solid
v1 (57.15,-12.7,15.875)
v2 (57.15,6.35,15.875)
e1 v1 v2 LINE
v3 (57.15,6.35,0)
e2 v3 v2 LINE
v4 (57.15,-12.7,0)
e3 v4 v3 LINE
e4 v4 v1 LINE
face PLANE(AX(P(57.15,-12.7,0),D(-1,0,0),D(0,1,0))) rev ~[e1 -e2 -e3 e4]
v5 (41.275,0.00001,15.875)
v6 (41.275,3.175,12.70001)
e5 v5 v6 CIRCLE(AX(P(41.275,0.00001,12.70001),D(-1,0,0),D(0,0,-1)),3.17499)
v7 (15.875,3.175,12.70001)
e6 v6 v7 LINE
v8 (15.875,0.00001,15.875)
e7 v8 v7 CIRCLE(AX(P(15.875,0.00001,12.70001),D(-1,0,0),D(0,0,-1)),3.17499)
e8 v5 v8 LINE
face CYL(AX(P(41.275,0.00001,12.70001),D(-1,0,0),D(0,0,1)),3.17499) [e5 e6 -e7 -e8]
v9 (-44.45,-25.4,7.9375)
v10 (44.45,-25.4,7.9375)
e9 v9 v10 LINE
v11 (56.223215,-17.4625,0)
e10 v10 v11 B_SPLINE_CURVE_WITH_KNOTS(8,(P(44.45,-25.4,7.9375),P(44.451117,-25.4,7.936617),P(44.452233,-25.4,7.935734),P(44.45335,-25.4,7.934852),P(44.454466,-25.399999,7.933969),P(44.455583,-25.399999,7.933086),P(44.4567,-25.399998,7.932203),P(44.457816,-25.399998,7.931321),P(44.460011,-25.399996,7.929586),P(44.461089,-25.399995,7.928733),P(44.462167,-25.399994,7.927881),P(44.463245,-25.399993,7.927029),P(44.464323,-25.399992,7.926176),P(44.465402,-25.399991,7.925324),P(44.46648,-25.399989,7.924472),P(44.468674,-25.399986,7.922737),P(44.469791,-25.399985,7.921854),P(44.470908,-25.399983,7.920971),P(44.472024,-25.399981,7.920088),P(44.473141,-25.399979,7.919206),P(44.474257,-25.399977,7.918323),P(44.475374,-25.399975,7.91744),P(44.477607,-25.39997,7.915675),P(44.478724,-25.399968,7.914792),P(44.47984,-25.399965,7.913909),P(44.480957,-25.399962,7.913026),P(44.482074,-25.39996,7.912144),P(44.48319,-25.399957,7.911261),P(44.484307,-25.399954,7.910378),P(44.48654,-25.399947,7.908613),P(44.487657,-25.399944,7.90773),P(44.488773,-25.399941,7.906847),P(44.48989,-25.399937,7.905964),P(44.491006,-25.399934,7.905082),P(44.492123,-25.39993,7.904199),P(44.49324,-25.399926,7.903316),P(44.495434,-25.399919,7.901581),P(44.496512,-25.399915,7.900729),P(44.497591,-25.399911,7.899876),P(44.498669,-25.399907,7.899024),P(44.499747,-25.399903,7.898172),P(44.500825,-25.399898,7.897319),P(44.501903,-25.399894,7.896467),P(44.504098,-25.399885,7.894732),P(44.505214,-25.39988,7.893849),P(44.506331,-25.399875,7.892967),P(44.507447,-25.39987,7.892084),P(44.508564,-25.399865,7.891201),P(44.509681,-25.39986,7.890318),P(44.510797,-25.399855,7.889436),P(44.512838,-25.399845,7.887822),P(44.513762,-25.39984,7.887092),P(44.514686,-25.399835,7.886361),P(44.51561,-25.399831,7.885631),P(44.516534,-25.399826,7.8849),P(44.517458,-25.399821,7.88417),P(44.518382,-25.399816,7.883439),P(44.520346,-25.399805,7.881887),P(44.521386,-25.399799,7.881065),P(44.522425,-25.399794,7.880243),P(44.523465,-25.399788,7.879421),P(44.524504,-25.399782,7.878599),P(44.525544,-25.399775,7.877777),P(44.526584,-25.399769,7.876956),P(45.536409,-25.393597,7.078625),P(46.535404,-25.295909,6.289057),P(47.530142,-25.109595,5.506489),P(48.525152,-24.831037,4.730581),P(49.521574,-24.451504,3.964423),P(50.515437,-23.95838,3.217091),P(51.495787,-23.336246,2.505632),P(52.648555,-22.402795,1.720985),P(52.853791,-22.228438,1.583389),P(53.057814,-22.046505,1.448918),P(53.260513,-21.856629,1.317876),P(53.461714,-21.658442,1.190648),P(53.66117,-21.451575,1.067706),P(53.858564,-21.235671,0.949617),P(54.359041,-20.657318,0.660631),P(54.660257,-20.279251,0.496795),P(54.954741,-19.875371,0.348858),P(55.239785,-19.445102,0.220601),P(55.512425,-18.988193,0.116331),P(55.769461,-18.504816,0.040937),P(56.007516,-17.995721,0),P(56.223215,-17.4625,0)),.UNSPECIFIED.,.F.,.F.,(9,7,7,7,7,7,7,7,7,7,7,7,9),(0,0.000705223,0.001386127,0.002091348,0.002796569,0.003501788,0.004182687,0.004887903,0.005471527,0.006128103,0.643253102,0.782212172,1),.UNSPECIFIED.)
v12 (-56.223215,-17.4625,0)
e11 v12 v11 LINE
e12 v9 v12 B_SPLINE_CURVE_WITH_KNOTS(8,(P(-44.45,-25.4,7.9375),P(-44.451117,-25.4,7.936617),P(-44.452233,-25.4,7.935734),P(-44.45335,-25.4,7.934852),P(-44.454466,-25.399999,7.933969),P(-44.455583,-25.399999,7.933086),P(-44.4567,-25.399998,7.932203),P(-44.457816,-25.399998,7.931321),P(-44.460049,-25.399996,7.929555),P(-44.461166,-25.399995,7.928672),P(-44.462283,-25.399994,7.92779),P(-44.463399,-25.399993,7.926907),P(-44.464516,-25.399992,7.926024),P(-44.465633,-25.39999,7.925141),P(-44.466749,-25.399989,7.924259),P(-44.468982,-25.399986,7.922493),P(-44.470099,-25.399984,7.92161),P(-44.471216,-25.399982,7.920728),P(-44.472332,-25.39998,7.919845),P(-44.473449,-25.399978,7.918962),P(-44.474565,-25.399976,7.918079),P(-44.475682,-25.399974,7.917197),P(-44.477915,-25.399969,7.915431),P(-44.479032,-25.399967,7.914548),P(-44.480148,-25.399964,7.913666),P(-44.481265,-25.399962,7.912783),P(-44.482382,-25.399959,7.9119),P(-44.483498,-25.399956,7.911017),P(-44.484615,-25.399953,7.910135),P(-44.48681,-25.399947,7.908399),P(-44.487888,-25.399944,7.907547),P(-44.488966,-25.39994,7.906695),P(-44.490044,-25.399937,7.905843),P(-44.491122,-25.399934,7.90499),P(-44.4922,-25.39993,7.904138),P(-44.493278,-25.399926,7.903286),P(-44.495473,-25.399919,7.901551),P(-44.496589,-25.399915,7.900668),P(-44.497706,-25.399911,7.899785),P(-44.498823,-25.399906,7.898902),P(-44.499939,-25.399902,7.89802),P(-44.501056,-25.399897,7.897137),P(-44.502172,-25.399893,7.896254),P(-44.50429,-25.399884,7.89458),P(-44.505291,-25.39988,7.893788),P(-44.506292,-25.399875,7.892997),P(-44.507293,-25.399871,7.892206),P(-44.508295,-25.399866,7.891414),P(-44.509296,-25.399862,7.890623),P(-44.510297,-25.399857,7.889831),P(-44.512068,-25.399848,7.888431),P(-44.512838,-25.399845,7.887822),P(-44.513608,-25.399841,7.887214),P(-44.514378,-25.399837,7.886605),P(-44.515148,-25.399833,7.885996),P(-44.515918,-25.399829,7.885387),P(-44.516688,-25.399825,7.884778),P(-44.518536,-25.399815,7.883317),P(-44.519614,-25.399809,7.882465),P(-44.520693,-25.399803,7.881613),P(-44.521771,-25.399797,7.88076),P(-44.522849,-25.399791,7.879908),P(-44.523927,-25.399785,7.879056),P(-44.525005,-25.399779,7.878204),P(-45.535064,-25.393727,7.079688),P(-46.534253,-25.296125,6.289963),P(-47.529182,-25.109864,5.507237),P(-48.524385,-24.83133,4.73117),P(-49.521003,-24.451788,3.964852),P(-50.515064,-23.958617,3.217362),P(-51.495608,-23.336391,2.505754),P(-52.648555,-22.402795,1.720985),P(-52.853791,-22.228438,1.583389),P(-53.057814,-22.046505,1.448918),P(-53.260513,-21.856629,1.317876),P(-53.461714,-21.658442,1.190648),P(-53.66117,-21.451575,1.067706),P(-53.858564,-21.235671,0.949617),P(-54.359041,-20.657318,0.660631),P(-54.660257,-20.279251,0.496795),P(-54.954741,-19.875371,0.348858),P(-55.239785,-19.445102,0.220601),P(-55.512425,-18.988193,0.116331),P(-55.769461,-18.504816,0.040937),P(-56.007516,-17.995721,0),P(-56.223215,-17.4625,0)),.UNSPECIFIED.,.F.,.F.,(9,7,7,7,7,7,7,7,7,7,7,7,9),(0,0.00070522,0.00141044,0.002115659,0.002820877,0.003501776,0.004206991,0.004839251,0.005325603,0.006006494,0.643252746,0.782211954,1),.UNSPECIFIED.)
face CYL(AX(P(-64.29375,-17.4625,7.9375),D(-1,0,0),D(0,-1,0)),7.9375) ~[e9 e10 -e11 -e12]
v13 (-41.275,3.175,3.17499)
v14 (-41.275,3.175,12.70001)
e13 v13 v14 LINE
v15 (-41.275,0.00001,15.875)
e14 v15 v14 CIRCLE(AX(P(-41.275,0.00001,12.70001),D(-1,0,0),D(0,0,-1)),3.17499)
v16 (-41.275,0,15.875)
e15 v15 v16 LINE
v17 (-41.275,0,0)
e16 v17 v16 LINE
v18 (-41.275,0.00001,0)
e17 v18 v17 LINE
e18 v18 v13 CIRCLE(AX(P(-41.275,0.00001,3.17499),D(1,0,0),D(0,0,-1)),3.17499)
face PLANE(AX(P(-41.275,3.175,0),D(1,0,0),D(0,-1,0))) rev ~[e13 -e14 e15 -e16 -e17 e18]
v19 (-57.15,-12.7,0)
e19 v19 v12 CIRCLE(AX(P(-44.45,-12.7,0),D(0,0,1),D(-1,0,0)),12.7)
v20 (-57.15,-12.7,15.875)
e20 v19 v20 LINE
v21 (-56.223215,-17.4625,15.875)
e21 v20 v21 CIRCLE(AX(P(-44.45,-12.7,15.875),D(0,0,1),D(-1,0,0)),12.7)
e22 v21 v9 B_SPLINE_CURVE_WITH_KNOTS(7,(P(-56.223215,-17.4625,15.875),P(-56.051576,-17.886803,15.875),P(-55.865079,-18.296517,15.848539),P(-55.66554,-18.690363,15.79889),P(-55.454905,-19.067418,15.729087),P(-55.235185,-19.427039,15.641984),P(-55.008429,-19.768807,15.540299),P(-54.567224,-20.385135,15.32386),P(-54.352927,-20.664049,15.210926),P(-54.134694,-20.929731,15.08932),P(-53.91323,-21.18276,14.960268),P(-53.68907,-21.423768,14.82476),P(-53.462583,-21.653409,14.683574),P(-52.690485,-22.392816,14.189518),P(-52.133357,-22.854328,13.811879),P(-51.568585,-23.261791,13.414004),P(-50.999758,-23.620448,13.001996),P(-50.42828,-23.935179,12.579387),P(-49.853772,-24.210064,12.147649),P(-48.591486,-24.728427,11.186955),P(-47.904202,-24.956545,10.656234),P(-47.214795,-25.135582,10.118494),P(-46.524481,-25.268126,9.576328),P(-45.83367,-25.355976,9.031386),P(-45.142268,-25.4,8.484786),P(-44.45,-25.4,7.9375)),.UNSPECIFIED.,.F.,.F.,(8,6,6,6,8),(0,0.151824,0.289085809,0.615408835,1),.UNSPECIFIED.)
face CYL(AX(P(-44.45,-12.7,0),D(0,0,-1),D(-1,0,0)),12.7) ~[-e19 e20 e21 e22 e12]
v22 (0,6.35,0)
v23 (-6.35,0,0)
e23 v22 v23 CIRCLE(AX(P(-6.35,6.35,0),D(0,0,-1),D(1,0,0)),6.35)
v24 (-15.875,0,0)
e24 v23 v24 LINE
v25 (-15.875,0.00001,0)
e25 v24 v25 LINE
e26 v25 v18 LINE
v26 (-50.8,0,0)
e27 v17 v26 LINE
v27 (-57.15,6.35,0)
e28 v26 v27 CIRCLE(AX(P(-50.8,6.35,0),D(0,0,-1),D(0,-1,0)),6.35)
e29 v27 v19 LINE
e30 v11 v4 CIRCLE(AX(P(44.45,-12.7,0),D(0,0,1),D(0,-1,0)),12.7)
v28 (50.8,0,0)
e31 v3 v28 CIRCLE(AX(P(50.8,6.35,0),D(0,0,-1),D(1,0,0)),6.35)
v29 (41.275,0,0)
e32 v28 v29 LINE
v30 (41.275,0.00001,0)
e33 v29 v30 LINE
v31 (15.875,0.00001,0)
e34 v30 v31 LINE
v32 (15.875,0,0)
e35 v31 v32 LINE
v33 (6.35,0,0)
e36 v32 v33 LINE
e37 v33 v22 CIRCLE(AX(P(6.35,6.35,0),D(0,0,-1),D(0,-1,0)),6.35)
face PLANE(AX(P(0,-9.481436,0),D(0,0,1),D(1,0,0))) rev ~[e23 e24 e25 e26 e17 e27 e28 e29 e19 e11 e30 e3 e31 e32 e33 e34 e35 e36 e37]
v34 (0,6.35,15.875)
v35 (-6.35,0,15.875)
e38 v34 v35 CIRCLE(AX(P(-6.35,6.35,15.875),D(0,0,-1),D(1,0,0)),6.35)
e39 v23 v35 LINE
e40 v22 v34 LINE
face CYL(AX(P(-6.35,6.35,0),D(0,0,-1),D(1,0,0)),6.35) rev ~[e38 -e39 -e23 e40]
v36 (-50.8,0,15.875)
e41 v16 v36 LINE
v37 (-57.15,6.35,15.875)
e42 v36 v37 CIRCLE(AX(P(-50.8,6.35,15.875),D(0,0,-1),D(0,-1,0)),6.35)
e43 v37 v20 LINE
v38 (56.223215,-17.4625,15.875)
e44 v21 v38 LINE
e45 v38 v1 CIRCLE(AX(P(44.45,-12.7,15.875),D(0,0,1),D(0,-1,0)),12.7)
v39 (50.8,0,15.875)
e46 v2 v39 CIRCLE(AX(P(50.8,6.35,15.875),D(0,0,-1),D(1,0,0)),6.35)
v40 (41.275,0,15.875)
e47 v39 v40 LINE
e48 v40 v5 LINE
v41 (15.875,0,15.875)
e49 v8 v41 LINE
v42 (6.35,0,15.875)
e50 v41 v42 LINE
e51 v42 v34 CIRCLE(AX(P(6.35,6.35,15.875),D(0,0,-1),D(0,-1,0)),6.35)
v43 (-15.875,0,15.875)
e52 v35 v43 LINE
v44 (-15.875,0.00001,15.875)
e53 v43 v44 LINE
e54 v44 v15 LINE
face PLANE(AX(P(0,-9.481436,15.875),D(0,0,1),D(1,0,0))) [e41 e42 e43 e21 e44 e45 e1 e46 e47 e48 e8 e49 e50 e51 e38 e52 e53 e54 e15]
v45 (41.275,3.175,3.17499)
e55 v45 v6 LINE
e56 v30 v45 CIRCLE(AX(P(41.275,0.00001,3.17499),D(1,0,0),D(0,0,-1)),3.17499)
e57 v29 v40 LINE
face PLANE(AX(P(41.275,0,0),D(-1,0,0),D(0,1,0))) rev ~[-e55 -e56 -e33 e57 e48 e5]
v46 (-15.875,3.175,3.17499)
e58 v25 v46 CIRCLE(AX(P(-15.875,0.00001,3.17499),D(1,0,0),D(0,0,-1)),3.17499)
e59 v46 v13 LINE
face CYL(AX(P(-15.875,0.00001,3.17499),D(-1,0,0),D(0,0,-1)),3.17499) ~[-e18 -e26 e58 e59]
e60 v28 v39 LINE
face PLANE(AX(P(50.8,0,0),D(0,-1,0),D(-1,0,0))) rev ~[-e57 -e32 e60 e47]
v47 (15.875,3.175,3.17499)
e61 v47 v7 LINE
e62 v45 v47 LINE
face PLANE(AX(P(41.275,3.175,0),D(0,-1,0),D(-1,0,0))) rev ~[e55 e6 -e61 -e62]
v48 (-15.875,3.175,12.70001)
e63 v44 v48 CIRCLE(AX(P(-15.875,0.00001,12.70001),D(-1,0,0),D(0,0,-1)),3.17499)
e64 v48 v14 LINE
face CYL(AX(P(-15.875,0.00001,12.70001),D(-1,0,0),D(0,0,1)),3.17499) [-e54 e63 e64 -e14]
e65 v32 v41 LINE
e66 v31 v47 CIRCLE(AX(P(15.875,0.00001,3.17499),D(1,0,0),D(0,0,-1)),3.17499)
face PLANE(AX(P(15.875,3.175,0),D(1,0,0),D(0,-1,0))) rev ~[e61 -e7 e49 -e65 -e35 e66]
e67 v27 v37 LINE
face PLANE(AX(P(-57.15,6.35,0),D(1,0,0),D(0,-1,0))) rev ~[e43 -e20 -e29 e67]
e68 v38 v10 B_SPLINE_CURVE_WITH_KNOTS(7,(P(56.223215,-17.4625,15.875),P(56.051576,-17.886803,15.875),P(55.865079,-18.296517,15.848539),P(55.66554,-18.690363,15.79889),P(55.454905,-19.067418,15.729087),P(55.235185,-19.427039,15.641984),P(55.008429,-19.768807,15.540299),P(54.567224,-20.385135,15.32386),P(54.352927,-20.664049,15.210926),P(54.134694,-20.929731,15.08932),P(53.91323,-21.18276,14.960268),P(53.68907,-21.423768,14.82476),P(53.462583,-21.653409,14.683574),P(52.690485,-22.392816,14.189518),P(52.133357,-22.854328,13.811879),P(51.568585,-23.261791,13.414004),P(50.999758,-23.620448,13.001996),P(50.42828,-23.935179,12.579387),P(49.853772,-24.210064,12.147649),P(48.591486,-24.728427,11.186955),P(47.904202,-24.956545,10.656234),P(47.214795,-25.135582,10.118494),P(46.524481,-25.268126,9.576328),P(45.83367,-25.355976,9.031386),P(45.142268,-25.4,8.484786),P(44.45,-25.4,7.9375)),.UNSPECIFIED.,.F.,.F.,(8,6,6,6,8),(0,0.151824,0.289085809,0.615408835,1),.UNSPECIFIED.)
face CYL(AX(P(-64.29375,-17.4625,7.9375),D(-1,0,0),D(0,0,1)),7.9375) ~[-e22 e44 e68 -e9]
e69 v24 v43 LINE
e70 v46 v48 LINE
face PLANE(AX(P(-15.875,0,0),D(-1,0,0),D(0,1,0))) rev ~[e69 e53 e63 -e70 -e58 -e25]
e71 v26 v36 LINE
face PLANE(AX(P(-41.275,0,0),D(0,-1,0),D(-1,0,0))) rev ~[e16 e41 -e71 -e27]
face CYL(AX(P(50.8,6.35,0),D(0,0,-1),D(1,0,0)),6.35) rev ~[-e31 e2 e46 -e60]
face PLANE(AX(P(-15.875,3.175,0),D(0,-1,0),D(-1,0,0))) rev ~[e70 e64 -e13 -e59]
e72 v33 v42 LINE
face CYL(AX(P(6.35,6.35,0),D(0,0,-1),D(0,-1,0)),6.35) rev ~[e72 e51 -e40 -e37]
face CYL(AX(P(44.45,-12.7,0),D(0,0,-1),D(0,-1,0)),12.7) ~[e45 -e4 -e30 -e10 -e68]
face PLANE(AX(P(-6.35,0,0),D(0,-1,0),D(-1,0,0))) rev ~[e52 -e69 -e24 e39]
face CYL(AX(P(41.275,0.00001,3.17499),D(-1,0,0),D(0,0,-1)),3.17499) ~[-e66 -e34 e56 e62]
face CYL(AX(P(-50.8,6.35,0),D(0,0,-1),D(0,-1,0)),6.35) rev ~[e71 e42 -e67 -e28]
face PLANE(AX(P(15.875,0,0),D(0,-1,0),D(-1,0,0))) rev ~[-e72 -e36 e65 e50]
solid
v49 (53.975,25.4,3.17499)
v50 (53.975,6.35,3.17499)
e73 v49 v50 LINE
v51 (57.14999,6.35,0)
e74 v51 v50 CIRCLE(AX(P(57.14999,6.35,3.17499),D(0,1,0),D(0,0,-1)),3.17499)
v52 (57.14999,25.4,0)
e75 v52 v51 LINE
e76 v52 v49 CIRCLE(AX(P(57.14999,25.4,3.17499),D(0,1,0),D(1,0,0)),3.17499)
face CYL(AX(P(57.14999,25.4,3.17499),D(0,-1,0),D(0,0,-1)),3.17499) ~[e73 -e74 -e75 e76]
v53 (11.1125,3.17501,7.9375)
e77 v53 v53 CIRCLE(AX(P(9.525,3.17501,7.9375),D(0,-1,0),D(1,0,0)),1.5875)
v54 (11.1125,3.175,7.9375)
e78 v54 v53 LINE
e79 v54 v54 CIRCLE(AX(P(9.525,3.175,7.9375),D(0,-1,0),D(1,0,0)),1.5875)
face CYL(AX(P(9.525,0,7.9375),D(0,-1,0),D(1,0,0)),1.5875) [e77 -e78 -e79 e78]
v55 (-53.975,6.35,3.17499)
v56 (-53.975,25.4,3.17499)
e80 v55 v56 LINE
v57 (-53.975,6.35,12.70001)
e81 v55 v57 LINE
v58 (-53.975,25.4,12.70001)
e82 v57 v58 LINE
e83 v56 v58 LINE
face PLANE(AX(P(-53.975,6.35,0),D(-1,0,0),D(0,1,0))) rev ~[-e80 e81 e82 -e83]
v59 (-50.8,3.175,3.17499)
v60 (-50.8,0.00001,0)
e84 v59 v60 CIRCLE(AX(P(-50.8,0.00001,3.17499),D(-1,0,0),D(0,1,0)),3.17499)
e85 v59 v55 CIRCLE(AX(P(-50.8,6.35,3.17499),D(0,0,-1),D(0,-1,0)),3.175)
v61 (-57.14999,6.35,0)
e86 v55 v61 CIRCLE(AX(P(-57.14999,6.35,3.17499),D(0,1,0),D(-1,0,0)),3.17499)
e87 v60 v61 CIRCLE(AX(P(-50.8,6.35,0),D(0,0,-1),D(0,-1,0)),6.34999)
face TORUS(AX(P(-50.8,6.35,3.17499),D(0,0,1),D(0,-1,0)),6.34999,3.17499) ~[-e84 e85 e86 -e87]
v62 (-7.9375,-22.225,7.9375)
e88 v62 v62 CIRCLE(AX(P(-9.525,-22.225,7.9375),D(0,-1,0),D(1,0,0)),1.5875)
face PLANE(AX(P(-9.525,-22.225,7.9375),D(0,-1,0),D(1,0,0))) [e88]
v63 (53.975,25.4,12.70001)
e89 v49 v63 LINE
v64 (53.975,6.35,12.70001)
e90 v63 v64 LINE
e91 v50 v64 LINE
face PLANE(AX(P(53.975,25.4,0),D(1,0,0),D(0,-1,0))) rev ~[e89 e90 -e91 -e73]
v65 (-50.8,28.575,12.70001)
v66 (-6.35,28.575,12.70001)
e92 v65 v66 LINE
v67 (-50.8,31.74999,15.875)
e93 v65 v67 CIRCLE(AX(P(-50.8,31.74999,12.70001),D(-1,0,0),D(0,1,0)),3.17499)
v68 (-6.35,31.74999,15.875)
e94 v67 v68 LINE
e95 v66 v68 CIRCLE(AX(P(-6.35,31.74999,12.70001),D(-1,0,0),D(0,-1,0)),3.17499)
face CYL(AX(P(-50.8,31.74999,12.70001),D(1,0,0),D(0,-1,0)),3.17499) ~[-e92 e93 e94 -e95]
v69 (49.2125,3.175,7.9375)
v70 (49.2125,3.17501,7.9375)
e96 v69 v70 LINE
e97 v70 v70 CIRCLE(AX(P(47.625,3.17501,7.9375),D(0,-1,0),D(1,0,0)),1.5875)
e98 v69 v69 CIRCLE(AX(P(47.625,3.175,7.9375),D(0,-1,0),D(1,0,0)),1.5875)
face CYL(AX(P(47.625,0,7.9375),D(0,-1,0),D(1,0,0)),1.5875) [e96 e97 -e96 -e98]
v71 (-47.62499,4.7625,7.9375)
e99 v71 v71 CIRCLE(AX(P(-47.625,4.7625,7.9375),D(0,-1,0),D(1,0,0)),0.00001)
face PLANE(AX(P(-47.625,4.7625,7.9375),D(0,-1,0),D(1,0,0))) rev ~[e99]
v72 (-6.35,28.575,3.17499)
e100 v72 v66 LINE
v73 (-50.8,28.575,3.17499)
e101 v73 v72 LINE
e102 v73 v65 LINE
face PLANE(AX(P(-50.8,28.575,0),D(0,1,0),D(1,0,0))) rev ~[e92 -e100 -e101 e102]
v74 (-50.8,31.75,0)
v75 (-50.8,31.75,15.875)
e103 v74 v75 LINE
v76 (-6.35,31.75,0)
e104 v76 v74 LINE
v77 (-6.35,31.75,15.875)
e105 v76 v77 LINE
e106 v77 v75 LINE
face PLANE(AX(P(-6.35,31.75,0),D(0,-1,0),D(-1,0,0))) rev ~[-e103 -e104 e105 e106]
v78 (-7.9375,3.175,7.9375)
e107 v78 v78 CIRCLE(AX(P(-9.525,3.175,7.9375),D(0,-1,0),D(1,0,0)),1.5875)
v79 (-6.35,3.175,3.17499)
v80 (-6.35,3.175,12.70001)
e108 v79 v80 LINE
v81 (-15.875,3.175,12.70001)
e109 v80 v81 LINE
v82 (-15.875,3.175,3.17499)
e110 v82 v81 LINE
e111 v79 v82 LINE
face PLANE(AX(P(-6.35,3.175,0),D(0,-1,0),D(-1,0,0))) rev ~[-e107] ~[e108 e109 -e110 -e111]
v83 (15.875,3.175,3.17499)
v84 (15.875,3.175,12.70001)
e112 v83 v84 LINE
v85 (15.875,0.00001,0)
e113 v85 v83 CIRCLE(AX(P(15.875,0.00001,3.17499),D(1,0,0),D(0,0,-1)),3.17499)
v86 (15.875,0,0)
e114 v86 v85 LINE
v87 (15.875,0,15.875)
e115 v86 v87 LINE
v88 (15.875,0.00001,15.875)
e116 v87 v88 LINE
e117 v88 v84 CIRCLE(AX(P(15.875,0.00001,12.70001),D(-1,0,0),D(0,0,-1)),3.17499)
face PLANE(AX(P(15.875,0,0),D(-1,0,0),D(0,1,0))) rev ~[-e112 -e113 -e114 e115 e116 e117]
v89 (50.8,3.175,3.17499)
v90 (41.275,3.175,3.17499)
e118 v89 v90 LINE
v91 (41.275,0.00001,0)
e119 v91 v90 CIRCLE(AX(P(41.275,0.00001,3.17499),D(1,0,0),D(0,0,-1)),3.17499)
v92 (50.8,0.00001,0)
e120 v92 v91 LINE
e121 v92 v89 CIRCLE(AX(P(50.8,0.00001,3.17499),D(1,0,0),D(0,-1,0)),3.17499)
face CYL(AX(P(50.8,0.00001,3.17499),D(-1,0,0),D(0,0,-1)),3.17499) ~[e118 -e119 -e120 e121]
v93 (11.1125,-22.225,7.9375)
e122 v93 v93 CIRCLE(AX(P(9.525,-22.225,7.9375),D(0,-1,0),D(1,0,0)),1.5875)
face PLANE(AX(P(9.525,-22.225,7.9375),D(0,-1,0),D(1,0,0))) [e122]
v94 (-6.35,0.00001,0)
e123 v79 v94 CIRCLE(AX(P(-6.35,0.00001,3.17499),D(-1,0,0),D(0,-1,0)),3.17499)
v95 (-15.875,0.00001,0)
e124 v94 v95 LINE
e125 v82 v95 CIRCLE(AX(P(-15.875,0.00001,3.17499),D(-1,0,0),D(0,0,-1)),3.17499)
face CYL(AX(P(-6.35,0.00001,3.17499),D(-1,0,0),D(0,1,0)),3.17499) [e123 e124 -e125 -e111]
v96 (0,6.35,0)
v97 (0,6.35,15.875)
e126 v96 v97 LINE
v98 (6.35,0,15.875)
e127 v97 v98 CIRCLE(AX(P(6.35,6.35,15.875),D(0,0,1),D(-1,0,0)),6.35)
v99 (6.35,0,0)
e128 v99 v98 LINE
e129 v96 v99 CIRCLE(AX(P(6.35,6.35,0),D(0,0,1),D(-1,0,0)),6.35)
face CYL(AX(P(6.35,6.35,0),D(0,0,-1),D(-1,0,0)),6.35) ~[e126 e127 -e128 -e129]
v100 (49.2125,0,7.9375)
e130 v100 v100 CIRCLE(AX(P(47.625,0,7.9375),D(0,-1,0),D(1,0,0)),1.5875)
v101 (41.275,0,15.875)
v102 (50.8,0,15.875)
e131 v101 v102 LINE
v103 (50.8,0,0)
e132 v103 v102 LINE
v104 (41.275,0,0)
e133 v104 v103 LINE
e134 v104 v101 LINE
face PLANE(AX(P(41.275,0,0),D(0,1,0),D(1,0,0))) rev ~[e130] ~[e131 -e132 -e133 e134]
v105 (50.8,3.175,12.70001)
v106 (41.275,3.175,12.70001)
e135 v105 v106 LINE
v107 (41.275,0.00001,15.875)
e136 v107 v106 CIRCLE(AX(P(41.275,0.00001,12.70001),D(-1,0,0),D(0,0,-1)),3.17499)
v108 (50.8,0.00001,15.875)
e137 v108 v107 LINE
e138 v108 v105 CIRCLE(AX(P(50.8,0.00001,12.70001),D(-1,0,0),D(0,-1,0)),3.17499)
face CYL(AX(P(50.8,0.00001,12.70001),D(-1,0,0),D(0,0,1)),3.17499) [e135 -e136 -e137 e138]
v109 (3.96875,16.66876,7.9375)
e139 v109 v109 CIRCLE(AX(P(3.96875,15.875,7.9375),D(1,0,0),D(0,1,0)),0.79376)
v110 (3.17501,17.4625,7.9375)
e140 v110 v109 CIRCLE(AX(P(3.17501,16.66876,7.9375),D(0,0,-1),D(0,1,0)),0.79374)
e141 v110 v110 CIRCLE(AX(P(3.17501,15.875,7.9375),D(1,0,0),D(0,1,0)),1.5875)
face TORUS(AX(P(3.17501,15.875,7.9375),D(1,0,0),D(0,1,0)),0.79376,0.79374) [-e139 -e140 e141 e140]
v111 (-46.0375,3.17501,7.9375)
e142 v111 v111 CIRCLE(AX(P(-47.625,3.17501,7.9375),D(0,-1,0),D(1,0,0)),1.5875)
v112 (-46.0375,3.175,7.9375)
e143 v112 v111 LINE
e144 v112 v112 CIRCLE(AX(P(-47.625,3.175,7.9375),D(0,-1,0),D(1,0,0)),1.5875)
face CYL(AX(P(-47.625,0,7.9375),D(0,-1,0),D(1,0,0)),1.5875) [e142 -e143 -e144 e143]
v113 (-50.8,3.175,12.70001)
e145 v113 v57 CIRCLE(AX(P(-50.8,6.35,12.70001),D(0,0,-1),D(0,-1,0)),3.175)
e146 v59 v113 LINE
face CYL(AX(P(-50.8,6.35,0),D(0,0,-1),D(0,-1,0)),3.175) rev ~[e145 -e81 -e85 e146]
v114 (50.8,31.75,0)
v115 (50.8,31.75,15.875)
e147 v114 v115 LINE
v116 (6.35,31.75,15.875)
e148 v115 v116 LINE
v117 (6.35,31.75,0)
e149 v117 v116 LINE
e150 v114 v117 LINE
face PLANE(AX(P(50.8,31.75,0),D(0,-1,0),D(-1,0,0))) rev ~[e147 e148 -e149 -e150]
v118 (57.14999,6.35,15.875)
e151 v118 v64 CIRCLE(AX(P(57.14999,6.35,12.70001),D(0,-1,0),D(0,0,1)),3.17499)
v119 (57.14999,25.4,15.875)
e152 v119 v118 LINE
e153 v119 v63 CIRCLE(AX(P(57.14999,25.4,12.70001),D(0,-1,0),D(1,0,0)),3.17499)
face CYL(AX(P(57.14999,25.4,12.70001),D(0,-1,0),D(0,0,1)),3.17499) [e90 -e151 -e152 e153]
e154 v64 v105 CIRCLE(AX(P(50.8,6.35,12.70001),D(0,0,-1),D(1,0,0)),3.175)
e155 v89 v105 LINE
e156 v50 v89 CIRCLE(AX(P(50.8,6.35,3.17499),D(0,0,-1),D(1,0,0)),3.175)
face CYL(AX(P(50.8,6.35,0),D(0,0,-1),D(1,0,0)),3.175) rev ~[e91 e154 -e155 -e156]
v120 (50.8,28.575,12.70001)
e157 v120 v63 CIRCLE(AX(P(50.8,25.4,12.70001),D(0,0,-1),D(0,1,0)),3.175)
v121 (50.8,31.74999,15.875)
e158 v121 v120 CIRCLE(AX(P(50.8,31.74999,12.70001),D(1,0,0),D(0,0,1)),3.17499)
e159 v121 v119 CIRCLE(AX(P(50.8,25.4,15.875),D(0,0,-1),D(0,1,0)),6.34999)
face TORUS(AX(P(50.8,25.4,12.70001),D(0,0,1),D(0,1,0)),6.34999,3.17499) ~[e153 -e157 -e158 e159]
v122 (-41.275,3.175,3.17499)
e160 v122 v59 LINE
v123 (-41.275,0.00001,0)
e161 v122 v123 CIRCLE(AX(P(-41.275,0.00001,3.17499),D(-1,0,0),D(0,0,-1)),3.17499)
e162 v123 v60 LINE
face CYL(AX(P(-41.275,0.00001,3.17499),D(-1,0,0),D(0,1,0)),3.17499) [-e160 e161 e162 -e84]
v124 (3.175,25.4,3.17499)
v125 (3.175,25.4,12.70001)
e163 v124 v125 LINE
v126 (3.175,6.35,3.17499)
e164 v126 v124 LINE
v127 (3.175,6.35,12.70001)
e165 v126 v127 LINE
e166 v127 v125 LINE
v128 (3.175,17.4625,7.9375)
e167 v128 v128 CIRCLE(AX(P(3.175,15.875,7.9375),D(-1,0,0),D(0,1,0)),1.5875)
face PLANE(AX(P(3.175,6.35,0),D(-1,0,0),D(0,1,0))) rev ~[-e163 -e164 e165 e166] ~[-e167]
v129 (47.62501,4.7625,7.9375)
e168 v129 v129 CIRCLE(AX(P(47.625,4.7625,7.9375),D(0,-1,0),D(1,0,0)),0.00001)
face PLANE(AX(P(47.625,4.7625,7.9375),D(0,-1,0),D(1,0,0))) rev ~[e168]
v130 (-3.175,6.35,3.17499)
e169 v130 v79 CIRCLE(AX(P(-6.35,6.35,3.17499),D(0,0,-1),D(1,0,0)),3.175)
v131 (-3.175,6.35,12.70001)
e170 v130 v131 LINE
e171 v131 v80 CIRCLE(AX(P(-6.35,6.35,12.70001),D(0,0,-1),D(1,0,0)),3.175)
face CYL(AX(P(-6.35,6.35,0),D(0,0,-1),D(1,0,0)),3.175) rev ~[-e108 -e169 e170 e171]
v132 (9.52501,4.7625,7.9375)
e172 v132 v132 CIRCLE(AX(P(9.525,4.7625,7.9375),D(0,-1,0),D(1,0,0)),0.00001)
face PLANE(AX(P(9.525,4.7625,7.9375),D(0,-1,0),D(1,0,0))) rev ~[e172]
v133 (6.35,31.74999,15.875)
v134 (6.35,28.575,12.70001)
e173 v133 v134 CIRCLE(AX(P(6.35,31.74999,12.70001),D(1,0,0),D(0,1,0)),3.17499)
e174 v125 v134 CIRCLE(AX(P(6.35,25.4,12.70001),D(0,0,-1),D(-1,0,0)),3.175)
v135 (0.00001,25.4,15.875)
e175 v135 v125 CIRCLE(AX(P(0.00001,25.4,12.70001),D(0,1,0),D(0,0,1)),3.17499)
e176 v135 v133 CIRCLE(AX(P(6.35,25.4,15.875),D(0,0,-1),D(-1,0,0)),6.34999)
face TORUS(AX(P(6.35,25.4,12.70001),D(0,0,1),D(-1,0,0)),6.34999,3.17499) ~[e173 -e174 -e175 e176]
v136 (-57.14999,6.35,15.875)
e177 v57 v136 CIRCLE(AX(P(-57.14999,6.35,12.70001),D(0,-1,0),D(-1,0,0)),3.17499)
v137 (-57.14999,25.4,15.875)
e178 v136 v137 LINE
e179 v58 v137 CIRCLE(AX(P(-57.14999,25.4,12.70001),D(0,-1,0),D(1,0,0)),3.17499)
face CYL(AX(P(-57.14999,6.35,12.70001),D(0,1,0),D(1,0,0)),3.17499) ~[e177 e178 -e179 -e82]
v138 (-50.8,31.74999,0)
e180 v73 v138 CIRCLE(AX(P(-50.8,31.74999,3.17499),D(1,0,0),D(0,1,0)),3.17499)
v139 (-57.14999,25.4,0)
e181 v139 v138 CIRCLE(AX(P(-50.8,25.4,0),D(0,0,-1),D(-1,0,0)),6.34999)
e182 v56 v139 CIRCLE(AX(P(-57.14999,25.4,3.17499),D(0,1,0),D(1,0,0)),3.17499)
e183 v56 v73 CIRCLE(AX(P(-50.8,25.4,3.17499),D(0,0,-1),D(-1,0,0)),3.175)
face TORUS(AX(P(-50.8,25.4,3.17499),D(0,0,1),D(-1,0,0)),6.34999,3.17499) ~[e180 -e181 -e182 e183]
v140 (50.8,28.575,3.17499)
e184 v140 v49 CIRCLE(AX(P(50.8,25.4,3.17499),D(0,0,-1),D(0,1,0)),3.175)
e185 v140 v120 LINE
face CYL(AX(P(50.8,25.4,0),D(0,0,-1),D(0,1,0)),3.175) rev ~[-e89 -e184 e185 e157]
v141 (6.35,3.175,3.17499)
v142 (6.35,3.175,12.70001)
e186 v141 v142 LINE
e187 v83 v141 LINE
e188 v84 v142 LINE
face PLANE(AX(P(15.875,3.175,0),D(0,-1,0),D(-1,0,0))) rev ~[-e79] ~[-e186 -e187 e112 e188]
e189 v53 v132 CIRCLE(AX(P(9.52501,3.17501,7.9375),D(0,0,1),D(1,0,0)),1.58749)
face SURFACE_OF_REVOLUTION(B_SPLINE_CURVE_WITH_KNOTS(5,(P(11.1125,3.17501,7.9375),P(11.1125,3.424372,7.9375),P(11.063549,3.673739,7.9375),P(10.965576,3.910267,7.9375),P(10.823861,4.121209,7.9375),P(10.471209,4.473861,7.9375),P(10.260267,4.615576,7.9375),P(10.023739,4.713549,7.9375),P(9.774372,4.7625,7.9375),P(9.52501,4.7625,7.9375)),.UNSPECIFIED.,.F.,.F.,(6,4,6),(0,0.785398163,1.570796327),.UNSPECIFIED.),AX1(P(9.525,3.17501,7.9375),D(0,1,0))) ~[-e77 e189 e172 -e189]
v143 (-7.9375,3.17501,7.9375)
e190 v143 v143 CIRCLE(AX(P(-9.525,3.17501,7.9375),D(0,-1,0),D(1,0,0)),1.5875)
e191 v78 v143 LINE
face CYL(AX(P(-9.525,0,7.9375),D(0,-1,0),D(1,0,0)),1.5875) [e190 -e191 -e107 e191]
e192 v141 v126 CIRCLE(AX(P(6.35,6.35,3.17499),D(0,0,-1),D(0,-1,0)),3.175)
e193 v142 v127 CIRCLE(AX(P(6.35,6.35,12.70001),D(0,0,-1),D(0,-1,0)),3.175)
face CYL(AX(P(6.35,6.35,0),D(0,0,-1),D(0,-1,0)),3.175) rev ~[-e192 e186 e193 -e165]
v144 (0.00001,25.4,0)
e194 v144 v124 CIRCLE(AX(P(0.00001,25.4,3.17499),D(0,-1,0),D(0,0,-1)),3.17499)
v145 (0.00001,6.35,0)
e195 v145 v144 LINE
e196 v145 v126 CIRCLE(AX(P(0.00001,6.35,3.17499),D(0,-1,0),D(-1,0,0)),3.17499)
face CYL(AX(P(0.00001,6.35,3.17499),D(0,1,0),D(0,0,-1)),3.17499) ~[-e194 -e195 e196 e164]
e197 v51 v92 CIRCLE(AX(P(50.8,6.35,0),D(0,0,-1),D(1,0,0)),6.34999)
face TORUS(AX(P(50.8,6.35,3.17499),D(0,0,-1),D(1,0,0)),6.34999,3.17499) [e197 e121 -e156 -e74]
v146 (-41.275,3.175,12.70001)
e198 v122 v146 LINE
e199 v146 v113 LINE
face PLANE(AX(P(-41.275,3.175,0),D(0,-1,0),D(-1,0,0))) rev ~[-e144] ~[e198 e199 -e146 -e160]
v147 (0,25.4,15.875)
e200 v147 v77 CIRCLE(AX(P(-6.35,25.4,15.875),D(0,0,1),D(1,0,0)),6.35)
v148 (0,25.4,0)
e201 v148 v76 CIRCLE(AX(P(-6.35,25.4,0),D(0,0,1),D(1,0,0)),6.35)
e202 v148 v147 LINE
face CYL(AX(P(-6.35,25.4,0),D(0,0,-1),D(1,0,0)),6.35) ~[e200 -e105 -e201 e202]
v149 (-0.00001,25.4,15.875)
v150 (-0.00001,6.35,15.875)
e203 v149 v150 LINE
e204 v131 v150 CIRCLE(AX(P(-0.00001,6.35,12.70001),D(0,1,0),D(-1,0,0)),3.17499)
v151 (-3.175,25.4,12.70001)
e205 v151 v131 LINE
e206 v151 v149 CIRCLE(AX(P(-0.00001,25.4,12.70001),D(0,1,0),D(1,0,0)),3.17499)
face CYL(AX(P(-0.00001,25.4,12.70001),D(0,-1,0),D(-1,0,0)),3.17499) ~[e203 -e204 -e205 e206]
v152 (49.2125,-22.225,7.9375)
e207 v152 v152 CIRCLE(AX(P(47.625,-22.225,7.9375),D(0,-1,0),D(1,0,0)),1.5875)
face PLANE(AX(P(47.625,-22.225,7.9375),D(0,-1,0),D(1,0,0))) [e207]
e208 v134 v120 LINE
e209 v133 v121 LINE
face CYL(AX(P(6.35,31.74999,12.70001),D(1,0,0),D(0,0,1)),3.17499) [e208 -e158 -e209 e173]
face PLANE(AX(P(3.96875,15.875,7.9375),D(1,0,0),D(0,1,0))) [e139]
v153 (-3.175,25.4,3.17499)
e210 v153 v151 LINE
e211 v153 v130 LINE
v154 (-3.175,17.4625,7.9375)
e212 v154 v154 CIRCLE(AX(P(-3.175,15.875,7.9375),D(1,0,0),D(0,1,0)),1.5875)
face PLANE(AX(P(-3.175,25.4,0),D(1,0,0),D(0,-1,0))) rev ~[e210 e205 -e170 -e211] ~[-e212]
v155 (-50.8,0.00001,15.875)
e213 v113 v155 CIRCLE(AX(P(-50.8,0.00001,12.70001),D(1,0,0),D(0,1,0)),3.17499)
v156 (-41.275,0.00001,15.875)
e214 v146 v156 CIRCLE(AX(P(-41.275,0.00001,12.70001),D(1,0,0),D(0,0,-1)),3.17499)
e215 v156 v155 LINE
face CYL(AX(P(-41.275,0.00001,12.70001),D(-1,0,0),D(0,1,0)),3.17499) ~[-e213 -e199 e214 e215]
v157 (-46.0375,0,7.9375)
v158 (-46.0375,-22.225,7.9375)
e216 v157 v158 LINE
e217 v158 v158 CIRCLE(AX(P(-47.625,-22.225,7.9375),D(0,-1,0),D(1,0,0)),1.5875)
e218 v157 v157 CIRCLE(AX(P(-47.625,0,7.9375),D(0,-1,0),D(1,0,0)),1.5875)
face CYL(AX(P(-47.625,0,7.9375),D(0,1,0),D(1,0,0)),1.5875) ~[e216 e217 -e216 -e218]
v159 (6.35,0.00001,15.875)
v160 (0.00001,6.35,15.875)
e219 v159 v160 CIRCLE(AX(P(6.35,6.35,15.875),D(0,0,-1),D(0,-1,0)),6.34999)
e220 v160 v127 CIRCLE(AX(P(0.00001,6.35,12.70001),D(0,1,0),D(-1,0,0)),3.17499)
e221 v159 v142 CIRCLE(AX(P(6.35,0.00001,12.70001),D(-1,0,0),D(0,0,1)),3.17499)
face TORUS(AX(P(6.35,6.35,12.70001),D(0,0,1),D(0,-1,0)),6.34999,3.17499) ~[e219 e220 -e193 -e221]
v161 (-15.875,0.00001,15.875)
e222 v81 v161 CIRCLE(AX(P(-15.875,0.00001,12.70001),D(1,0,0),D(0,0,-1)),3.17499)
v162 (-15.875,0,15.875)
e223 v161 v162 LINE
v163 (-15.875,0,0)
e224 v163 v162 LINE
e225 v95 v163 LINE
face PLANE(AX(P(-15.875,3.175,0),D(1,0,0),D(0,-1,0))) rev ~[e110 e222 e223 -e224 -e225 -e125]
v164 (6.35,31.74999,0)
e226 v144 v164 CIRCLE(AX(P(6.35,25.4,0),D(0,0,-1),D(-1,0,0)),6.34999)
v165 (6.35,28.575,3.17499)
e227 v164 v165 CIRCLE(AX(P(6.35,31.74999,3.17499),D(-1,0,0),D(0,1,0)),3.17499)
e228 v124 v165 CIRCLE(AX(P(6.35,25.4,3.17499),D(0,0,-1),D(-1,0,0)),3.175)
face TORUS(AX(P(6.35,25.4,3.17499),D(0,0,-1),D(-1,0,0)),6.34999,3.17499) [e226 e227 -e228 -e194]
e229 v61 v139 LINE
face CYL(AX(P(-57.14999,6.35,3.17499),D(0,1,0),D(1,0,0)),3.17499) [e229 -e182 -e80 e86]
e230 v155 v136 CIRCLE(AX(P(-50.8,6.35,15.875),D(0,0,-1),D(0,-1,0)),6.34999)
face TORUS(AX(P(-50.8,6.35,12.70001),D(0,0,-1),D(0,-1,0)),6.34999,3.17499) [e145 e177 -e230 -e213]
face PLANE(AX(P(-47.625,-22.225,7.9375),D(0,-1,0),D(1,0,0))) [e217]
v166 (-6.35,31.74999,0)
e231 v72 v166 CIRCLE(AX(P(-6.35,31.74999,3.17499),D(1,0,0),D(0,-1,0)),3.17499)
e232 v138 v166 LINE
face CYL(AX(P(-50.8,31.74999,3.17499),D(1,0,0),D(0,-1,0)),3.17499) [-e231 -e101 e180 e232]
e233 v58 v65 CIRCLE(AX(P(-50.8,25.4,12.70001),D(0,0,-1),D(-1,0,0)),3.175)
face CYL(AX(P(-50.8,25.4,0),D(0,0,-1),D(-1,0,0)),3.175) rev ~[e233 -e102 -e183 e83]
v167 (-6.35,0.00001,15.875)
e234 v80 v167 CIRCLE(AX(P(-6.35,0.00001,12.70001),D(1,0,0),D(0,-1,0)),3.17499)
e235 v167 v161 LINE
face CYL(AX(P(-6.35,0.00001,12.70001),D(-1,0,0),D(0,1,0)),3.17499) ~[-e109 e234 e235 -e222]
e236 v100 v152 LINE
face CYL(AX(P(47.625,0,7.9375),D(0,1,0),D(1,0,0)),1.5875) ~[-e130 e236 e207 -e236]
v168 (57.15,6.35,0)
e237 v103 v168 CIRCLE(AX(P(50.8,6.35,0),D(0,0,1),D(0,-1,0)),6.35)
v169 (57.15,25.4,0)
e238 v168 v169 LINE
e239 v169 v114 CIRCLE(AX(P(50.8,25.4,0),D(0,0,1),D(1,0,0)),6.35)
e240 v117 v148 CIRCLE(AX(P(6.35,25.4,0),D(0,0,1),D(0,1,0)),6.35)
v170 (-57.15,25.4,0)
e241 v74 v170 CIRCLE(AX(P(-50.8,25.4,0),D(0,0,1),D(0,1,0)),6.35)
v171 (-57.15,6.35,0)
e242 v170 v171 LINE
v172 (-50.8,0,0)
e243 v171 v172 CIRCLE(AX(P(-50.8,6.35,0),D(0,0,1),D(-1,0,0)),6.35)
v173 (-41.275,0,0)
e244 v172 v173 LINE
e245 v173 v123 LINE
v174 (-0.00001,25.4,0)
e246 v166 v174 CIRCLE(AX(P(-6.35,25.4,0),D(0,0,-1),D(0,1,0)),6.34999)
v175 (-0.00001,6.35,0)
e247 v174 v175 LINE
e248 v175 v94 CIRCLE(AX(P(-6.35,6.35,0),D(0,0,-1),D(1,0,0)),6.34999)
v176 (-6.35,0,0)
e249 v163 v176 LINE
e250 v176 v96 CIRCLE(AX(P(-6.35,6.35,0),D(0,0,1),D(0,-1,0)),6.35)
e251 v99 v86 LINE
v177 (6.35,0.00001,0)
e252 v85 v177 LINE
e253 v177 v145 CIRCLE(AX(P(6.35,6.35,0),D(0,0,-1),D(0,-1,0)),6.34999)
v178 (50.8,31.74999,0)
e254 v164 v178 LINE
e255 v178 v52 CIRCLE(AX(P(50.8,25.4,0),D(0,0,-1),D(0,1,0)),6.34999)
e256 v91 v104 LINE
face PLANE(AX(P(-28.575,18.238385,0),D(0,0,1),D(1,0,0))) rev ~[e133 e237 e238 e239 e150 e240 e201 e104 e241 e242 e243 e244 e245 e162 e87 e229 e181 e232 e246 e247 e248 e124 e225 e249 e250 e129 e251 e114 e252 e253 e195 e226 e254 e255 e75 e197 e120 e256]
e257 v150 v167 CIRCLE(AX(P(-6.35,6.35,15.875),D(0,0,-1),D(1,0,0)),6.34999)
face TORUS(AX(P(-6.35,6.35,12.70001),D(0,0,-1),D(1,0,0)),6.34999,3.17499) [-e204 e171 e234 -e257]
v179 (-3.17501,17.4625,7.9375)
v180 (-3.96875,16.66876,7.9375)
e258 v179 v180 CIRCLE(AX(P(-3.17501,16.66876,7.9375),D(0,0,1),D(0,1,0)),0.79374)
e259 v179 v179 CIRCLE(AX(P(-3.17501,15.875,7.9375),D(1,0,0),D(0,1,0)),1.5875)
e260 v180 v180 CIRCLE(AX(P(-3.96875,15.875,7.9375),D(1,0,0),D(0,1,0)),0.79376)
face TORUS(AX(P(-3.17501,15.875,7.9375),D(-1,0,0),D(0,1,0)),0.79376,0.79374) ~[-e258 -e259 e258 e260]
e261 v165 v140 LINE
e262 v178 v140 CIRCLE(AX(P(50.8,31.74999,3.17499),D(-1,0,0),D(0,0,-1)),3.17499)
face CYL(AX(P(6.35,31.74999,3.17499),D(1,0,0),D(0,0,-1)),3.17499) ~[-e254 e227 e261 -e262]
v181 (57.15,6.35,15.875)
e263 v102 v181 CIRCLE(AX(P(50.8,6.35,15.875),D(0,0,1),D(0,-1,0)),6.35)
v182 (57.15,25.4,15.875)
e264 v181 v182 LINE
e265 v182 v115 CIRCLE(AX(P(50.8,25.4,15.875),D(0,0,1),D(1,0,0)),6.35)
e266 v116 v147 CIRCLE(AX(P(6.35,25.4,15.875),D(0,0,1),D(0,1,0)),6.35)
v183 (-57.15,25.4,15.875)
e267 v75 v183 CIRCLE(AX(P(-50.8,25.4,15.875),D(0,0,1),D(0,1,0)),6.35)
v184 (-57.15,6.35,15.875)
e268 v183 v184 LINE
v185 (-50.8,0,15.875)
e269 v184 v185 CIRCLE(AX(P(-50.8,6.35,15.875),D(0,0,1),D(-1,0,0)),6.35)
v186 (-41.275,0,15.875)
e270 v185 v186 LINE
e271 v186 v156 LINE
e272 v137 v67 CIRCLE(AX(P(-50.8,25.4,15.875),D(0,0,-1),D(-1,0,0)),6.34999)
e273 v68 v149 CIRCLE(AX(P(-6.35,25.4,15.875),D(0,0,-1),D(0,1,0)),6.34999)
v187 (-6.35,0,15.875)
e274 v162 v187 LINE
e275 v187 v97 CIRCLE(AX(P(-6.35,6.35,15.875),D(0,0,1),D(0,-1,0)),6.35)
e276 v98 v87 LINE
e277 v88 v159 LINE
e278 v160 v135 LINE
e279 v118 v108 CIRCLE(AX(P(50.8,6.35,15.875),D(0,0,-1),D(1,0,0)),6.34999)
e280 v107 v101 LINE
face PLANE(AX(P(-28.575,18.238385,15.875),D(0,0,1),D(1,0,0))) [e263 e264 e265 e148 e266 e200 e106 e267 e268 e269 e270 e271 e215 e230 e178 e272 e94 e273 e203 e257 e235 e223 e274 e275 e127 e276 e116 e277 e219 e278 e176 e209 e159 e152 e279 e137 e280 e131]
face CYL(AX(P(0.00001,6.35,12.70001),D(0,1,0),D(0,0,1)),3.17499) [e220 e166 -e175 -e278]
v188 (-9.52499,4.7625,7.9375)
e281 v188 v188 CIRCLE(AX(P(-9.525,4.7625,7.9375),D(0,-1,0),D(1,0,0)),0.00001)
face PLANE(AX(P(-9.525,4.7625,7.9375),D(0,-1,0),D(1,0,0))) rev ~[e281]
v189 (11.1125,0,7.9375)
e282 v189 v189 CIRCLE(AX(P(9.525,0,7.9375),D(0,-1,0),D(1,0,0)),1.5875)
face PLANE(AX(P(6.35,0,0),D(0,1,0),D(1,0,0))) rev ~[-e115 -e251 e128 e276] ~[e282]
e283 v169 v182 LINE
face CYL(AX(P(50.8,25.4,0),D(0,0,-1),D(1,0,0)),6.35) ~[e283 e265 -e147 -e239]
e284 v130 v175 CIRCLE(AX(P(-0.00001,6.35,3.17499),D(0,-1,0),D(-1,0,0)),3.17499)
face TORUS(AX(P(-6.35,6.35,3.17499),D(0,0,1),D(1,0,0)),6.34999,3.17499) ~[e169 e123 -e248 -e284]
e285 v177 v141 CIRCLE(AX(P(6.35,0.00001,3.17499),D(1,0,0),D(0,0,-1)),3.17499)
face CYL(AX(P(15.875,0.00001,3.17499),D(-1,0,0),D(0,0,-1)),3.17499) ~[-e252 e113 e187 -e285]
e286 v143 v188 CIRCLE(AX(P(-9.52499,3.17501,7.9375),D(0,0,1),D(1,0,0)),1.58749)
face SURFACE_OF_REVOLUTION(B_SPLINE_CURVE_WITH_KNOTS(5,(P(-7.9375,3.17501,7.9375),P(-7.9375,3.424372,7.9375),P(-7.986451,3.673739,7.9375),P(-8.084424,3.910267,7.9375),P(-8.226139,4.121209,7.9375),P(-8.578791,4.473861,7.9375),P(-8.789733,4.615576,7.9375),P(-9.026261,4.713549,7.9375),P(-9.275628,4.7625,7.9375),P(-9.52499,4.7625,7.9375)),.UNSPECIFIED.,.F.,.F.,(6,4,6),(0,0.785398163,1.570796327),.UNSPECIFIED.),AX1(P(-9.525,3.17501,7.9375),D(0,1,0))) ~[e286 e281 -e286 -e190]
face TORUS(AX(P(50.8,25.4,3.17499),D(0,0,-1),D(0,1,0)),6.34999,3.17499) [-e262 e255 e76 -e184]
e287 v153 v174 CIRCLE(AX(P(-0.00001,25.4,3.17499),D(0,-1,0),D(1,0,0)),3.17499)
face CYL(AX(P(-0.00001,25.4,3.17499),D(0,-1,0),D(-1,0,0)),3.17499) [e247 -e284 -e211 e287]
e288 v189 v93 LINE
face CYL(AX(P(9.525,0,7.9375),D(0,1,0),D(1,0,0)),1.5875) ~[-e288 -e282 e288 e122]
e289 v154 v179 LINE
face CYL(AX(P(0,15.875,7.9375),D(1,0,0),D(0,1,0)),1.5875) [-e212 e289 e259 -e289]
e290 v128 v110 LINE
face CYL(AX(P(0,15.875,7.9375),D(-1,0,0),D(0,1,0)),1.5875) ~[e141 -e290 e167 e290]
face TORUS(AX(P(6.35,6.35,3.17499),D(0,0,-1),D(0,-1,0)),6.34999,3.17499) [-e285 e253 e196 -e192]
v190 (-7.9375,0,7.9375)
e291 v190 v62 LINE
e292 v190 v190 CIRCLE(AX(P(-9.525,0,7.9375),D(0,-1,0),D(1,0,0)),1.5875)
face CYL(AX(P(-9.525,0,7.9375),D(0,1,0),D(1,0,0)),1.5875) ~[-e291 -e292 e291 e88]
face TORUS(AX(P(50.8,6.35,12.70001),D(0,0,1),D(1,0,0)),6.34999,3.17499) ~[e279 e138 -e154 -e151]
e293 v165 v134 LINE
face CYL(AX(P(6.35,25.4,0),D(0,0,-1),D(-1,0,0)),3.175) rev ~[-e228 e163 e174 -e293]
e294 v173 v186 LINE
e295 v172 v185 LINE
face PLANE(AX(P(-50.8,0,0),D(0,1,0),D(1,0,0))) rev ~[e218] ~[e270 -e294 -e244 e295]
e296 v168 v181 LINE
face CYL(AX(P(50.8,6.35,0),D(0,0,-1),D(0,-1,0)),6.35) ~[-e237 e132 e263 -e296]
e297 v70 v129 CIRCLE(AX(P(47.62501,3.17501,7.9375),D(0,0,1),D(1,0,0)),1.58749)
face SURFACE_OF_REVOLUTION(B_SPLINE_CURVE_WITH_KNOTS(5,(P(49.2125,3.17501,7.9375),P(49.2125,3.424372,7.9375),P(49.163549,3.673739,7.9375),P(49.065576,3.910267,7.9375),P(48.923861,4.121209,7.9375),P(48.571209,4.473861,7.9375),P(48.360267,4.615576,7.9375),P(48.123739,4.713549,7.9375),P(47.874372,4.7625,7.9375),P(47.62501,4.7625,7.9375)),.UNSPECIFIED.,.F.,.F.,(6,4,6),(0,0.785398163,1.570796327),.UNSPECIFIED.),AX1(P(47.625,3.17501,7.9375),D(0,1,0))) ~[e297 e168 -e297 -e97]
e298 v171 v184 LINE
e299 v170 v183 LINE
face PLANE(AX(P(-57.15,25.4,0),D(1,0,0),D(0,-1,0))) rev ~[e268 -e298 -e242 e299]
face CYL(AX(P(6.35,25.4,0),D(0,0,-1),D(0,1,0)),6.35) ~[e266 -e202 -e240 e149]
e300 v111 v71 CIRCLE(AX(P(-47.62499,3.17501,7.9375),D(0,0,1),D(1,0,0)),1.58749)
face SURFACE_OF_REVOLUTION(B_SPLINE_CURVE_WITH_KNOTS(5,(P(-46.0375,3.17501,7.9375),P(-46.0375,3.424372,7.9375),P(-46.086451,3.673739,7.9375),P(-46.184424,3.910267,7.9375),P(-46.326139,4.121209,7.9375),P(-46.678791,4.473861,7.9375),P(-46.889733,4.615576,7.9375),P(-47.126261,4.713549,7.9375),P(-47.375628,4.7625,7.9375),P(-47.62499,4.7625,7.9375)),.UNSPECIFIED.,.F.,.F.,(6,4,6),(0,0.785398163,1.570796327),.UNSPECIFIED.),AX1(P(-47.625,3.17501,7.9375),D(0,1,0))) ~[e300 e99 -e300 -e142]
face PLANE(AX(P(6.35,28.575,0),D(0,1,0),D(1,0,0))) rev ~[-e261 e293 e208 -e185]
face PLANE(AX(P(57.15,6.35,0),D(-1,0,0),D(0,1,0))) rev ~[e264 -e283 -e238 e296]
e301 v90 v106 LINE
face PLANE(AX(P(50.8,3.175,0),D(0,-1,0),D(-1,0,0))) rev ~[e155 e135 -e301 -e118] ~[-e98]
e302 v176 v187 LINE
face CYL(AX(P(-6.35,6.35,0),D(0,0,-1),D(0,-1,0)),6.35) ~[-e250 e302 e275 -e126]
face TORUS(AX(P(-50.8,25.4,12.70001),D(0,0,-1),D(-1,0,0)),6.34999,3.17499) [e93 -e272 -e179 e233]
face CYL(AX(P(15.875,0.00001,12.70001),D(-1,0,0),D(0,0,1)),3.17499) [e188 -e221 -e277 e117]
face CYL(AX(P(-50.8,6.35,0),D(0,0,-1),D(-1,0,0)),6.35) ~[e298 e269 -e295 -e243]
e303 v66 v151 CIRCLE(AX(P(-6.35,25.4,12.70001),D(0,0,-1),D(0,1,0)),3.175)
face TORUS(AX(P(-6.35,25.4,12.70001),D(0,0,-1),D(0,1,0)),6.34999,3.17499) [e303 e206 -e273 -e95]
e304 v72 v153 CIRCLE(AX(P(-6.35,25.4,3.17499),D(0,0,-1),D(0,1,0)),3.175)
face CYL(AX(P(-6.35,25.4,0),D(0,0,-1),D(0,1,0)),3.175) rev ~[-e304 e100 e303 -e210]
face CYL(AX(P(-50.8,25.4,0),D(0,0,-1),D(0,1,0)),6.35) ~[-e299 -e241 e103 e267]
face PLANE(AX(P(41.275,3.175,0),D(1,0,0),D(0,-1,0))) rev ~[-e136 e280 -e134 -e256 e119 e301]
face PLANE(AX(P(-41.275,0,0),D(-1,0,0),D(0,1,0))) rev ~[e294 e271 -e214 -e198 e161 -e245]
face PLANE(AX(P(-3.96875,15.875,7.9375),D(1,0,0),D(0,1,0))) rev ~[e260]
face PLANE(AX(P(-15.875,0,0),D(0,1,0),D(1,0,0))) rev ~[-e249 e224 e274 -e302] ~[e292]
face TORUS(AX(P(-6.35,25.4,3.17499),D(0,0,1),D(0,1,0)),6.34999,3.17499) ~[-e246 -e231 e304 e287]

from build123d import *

# Parameters (mm, degrees)
F1_DEPTH      = 15.875
F3_DEPTH      = 15.875
F4_R          = 1.5875
F5_DEPTH      = 3.96875
F5_DEPTH_BACK = 3.96875
F6_R          = 0.79374
F7_R          = 1.5875
F8_DEPTH      = 22.225
F8_DEPTH_BACK = 4.7625
F9_R          = 1.58749
F10_T1_DEPTH  = 128.5875
F11_R         = 3.17499
F11_2_R       = 3.17499


# Not quite as in the source:
# - a fillet or chamfer that OpenCascade refuses, or shapes differently, is made with other operations: its cross-section is extruded or revolved along the edge and cut away or added
# - a fillet or chamfer is up to 0.001 mm smaller than in the source, because OpenCascade refuses the exact size


with BuildPart() as f1:
    # F0 (on Top) → F1 (new body)
    with BuildSketch(Plane.XY):
        with BuildLine():
            Line((-15.875, 0), (-6.35, 0))
            ThreePointArc((-6.35, 0), (-1.8598719395, 1.8598719395), (0, 6.35))
            Line((0, 6.35), (0, 25.4))
            ThreePointArc((0, 25.4), (-1.8598719395, 29.8901280605), (-6.35, 31.75))
            Line((-6.35, 31.75), (-50.8, 31.75))
            ThreePointArc((-50.8, 31.75), (-55.2901280605, 29.8901280605), (-57.15, 25.4))
            Line((-57.15, 25.4), (-57.15, 6.35))
            ThreePointArc((-57.15, 6.35), (-55.2901280605, 1.8598719395), (-50.8, 0))
            Line((-50.8, 0), (-41.275, 0))
            Line((-41.275, 0), (-41.275, 3.175))
            Line((-41.275, 3.175), (-50.8, 3.175))
            ThreePointArc((-50.8, 3.175), (-53.0450640303, 4.1049359697), (-53.975, 6.35))
            Line((-53.975, 6.35), (-53.975, 25.4))
            ThreePointArc((-53.975, 25.4), (-53.0450640303, 27.6450640303), (-50.8, 28.575))
            Line((-50.8, 28.575), (-6.35, 28.575))
            ThreePointArc((-6.35, 28.575), (-4.1049359697, 27.6450640303), (-3.175, 25.4))
            Line((-3.175, 25.4), (-3.175, 6.35))
            ThreePointArc((-3.175, 6.35), (-4.1049359697, 4.1049359697), (-6.35, 3.175))
            Line((-6.35, 3.175), (-15.875, 3.175))
            Line((-15.875, 3.175), (-15.875, 0))
        make_face()
        with BuildLine():
            Line((0, 25.4), (0, 6.35))
            ThreePointArc((0, 6.35), (1.8598719395, 1.8598719395), (6.35, 0))
            Line((6.35, 0), (15.875, 0))
            Line((15.875, 0), (15.875, 3.175))
            Line((15.875, 3.175), (6.35, 3.175))
            ThreePointArc((6.35, 3.175), (4.1049359697, 4.1049359697), (3.175, 6.35))
            Line((3.175, 6.35), (3.175, 25.4))
            ThreePointArc((3.175, 25.4), (4.1049359697, 27.6450640303), (6.35, 28.575))
            Line((6.35, 28.575), (50.8, 28.575))
            ThreePointArc((50.8, 28.575), (53.0450640303, 27.6450640303), (53.975, 25.4))
            Line((53.975, 25.4), (53.975, 6.35))
            ThreePointArc((53.975, 6.35), (53.0450640303, 4.1049359697), (50.8, 3.175))
            Line((50.8, 3.175), (41.275, 3.175))
            Line((41.275, 3.175), (41.275, 0))
            Line((41.275, 0), (50.8, 0))
            ThreePointArc((50.8, 0), (55.2901280605, 1.8598719395), (57.15, 6.35))
            Line((57.15, 6.35), (57.15, 25.4))
            ThreePointArc((57.15, 25.4), (55.2901280605, 29.8901280605), (50.8, 31.75))
            Line((50.8, 31.75), (6.35, 31.75))
            ThreePointArc((6.35, 31.75), (1.8598719395, 29.8901280605), (0, 25.4))
        make_face()
    extrude(amount=F1_DEPTH)

    # F4 (on Right) → F5 (join, two sides)
    with BuildSketch(Plane.YZ) as f5_sk:
        with Locations((15.875, 7.9375)):
            Circle(F4_R)
    extrude(amount=F5_DEPTH)
    extrude(f5_sk.sketch, amount=-F5_DEPTH_BACK)

    # F6 (radius 0.79375 in the source; OpenCascade refuses exactly that, so slightly less here)
    f6_edges = [f1.edges().sort_by_distance(p)[0] for p in [
        (-3.96875, 14.2875, 7.9375),
        (3.96875, 14.2875, 7.9375),
    ]]
    fillet(f6_edges, radius=F6_R)

    # F7 (on Front) → F8 (join, two sides)
    with BuildSketch(Plane.XZ) as f8_sk:
        with Locations((-9.525, 7.9375)):
            Circle(F7_R)
        with Locations((9.525, 7.9375)):
            Circle(F7_R)
        with Locations((-47.625, 7.9375)):
            Circle(F7_R)
        with Locations((47.625, 7.9375)):
            Circle(F7_R)
    extrude(amount=F8_DEPTH)
    extrude(f8_sk.sketch, amount=-F8_DEPTH_BACK)

    # F9 (radius 1.5875 in the source; OpenCascade refuses exactly that, so slightly less here)
    f9_edges = [f1.edges().sort_by_distance(p)[0] for p in [
        (46.0375, 4.7625, 7.9375),
        (7.9375, 4.7625, 7.9375),
        (-11.1125, 4.7625, 7.9375),
        (-49.2125, 4.7625, 7.9375),
    ]]
    fillet(f9_edges, radius=F9_R)

    # F11 (radius 3.175 in the source; OpenCascade refuses exactly that, so slightly less here)
    f11_edges = [f1.edges().sort_by_distance(p)[0] for p in [
        (11.1125, 3.175, 15.875),
        (11.1125, 3.175, 0),
        (46.0375, 3.175, 0),
        (46.0375, 3.175, 15.875),
        (-11.1125, 3.175, 0),
        (-11.1125, 3.175, 15.875),
        (-46.0375, 3.175, 15.875),
        (-46.0375, 3.175, 0),
        (-4.104936, 4.104936, 0),
        (-3.175, 15.875, 0),
        (-3.175, 15.875, 15.875),
        (-4.104936, 4.104936, 15.875),
        (3.175, 15.875, 0),
        (3.175, 15.875, 15.875),
        (4.104936, 4.104936, 0),
        (4.104936, 4.104936, 15.875),
        (4.104936, 27.645064, 0),
        (28.575, 28.575, 0),
        (53.045064, 27.645064, 0),
        (53.975, 15.875, 0),
        (53.045064, 4.104936, 0),
        (-53.045064, 4.104936, 0),
        (-53.975, 15.875, 0),
        (-53.045064, 27.645064, 0),
        (-28.575, 28.575, 0),
        (-4.104936, 27.645064, 0),
        (4.104936, 27.645064, 15.875),
        (28.575, 28.575, 15.875),
        (53.045064, 27.645064, 15.875),
        (53.975, 15.875, 15.875),
        (53.045064, 4.104936, 15.875),
        (-53.045064, 4.104936, 15.875),
        (-53.975, 15.875, 15.875),
        (-53.045064, 27.645064, 15.875),
        (-28.575, 28.575, 15.875),
        (-4.104936, 27.645064, 15.875),
    ]]
    fillet(f11_edges, radius=F11_R)


with BuildPart() as f3:
    # F2 (on Top) → F3 (new body)
    with BuildSketch(Plane.XY):
        with BuildLine():
            ThreePointArc((57.15, 6.35), (55.2901280605, 1.8598719395), (50.8, 0))
            Line((50.8, 0), (41.275, 0))
            Line((41.275, 0), (41.275, 3.175))
            Line((41.275, 3.175), (15.875, 3.175))
            Line((15.875, 3.175), (15.875, 0))
            Line((15.875, 0), (6.35, 0))
            ThreePointArc((6.35, 0), (1.8598719395, 1.8598719395), (0, 6.35))
            ThreePointArc((0, 6.35), (-1.8598719395, 1.8598719395), (-6.35, 0))
            Line((-6.35, 0), (-15.875, 0))
            Line((-15.875, 0), (-15.875, 3.175))
            Line((-15.875, 3.175), (-41.275, 3.175))
            Line((-41.275, 3.175), (-41.275, 0))
            Line((-41.275, 0), (-50.8, 0))
            ThreePointArc((-50.8, 0), (-55.2901280605, 1.8598719395), (-57.15, 6.35))
            Line((-57.15, 6.35), (-57.15, 0))
            Line((-57.15, 0), (-57.15, -12.7))
            ThreePointArc((-57.15, -12.7), (-53.4302561211, -21.6802561211), (-44.45, -25.4))
            Line((-44.45, -25.4), (44.45, -25.4))
            ThreePointArc((44.45, -25.4), (53.4302561211, -21.6802561211), (57.15, -12.7))
            Line((57.15, -12.7), (57.15, 0))
            Line((57.15, 0), (57.15, 6.35))
        make_face()
    extrude(amount=F3_DEPTH)

    # F10: fillet of radius 7.9375 on 2 edges, made by hand

    # F10_s2 → F10_t1 (cut)
    with BuildSketch(Plane.YZ.offset(-64.29375)):
        with BuildLine():
            ThreePointArc((-17.4625, 15.875), (-23.0751600757, 13.5501600757), (-25.4, 7.9375))
            Line((-25.4, 7.9375), (-25.4, 15.875))
            Line((-25.4, 15.875), (-17.4625, 15.875))
        make_face()
        with BuildLine():
            ThreePointArc((-25.4, 7.9375), (-23.0751600757, 2.3248399243), (-17.4625, 0))
            Line((-17.4625, 0), (-25.4, 0))
            Line((-25.4, 0), (-25.4, 7.9375))
        make_face()
    extrude(amount=F10_T1_DEPTH, mode=Mode.SUBTRACT)

    # F11#2 (radius 3.175 in the source; OpenCascade refuses exactly that, so slightly less here)
    f11_2_edges = [f3.edges().sort_by_distance(p)[0] for p in [
        (-28.575, 3.175, 0),
        (-28.575, 3.175, 15.875),
        (28.575, 3.175, 0),
        (28.575, 3.175, 15.875),
    ]]
    fillet(f11_2_edges, radius=F11_2_R)


solid = Compound([f1.part, f3.part])
